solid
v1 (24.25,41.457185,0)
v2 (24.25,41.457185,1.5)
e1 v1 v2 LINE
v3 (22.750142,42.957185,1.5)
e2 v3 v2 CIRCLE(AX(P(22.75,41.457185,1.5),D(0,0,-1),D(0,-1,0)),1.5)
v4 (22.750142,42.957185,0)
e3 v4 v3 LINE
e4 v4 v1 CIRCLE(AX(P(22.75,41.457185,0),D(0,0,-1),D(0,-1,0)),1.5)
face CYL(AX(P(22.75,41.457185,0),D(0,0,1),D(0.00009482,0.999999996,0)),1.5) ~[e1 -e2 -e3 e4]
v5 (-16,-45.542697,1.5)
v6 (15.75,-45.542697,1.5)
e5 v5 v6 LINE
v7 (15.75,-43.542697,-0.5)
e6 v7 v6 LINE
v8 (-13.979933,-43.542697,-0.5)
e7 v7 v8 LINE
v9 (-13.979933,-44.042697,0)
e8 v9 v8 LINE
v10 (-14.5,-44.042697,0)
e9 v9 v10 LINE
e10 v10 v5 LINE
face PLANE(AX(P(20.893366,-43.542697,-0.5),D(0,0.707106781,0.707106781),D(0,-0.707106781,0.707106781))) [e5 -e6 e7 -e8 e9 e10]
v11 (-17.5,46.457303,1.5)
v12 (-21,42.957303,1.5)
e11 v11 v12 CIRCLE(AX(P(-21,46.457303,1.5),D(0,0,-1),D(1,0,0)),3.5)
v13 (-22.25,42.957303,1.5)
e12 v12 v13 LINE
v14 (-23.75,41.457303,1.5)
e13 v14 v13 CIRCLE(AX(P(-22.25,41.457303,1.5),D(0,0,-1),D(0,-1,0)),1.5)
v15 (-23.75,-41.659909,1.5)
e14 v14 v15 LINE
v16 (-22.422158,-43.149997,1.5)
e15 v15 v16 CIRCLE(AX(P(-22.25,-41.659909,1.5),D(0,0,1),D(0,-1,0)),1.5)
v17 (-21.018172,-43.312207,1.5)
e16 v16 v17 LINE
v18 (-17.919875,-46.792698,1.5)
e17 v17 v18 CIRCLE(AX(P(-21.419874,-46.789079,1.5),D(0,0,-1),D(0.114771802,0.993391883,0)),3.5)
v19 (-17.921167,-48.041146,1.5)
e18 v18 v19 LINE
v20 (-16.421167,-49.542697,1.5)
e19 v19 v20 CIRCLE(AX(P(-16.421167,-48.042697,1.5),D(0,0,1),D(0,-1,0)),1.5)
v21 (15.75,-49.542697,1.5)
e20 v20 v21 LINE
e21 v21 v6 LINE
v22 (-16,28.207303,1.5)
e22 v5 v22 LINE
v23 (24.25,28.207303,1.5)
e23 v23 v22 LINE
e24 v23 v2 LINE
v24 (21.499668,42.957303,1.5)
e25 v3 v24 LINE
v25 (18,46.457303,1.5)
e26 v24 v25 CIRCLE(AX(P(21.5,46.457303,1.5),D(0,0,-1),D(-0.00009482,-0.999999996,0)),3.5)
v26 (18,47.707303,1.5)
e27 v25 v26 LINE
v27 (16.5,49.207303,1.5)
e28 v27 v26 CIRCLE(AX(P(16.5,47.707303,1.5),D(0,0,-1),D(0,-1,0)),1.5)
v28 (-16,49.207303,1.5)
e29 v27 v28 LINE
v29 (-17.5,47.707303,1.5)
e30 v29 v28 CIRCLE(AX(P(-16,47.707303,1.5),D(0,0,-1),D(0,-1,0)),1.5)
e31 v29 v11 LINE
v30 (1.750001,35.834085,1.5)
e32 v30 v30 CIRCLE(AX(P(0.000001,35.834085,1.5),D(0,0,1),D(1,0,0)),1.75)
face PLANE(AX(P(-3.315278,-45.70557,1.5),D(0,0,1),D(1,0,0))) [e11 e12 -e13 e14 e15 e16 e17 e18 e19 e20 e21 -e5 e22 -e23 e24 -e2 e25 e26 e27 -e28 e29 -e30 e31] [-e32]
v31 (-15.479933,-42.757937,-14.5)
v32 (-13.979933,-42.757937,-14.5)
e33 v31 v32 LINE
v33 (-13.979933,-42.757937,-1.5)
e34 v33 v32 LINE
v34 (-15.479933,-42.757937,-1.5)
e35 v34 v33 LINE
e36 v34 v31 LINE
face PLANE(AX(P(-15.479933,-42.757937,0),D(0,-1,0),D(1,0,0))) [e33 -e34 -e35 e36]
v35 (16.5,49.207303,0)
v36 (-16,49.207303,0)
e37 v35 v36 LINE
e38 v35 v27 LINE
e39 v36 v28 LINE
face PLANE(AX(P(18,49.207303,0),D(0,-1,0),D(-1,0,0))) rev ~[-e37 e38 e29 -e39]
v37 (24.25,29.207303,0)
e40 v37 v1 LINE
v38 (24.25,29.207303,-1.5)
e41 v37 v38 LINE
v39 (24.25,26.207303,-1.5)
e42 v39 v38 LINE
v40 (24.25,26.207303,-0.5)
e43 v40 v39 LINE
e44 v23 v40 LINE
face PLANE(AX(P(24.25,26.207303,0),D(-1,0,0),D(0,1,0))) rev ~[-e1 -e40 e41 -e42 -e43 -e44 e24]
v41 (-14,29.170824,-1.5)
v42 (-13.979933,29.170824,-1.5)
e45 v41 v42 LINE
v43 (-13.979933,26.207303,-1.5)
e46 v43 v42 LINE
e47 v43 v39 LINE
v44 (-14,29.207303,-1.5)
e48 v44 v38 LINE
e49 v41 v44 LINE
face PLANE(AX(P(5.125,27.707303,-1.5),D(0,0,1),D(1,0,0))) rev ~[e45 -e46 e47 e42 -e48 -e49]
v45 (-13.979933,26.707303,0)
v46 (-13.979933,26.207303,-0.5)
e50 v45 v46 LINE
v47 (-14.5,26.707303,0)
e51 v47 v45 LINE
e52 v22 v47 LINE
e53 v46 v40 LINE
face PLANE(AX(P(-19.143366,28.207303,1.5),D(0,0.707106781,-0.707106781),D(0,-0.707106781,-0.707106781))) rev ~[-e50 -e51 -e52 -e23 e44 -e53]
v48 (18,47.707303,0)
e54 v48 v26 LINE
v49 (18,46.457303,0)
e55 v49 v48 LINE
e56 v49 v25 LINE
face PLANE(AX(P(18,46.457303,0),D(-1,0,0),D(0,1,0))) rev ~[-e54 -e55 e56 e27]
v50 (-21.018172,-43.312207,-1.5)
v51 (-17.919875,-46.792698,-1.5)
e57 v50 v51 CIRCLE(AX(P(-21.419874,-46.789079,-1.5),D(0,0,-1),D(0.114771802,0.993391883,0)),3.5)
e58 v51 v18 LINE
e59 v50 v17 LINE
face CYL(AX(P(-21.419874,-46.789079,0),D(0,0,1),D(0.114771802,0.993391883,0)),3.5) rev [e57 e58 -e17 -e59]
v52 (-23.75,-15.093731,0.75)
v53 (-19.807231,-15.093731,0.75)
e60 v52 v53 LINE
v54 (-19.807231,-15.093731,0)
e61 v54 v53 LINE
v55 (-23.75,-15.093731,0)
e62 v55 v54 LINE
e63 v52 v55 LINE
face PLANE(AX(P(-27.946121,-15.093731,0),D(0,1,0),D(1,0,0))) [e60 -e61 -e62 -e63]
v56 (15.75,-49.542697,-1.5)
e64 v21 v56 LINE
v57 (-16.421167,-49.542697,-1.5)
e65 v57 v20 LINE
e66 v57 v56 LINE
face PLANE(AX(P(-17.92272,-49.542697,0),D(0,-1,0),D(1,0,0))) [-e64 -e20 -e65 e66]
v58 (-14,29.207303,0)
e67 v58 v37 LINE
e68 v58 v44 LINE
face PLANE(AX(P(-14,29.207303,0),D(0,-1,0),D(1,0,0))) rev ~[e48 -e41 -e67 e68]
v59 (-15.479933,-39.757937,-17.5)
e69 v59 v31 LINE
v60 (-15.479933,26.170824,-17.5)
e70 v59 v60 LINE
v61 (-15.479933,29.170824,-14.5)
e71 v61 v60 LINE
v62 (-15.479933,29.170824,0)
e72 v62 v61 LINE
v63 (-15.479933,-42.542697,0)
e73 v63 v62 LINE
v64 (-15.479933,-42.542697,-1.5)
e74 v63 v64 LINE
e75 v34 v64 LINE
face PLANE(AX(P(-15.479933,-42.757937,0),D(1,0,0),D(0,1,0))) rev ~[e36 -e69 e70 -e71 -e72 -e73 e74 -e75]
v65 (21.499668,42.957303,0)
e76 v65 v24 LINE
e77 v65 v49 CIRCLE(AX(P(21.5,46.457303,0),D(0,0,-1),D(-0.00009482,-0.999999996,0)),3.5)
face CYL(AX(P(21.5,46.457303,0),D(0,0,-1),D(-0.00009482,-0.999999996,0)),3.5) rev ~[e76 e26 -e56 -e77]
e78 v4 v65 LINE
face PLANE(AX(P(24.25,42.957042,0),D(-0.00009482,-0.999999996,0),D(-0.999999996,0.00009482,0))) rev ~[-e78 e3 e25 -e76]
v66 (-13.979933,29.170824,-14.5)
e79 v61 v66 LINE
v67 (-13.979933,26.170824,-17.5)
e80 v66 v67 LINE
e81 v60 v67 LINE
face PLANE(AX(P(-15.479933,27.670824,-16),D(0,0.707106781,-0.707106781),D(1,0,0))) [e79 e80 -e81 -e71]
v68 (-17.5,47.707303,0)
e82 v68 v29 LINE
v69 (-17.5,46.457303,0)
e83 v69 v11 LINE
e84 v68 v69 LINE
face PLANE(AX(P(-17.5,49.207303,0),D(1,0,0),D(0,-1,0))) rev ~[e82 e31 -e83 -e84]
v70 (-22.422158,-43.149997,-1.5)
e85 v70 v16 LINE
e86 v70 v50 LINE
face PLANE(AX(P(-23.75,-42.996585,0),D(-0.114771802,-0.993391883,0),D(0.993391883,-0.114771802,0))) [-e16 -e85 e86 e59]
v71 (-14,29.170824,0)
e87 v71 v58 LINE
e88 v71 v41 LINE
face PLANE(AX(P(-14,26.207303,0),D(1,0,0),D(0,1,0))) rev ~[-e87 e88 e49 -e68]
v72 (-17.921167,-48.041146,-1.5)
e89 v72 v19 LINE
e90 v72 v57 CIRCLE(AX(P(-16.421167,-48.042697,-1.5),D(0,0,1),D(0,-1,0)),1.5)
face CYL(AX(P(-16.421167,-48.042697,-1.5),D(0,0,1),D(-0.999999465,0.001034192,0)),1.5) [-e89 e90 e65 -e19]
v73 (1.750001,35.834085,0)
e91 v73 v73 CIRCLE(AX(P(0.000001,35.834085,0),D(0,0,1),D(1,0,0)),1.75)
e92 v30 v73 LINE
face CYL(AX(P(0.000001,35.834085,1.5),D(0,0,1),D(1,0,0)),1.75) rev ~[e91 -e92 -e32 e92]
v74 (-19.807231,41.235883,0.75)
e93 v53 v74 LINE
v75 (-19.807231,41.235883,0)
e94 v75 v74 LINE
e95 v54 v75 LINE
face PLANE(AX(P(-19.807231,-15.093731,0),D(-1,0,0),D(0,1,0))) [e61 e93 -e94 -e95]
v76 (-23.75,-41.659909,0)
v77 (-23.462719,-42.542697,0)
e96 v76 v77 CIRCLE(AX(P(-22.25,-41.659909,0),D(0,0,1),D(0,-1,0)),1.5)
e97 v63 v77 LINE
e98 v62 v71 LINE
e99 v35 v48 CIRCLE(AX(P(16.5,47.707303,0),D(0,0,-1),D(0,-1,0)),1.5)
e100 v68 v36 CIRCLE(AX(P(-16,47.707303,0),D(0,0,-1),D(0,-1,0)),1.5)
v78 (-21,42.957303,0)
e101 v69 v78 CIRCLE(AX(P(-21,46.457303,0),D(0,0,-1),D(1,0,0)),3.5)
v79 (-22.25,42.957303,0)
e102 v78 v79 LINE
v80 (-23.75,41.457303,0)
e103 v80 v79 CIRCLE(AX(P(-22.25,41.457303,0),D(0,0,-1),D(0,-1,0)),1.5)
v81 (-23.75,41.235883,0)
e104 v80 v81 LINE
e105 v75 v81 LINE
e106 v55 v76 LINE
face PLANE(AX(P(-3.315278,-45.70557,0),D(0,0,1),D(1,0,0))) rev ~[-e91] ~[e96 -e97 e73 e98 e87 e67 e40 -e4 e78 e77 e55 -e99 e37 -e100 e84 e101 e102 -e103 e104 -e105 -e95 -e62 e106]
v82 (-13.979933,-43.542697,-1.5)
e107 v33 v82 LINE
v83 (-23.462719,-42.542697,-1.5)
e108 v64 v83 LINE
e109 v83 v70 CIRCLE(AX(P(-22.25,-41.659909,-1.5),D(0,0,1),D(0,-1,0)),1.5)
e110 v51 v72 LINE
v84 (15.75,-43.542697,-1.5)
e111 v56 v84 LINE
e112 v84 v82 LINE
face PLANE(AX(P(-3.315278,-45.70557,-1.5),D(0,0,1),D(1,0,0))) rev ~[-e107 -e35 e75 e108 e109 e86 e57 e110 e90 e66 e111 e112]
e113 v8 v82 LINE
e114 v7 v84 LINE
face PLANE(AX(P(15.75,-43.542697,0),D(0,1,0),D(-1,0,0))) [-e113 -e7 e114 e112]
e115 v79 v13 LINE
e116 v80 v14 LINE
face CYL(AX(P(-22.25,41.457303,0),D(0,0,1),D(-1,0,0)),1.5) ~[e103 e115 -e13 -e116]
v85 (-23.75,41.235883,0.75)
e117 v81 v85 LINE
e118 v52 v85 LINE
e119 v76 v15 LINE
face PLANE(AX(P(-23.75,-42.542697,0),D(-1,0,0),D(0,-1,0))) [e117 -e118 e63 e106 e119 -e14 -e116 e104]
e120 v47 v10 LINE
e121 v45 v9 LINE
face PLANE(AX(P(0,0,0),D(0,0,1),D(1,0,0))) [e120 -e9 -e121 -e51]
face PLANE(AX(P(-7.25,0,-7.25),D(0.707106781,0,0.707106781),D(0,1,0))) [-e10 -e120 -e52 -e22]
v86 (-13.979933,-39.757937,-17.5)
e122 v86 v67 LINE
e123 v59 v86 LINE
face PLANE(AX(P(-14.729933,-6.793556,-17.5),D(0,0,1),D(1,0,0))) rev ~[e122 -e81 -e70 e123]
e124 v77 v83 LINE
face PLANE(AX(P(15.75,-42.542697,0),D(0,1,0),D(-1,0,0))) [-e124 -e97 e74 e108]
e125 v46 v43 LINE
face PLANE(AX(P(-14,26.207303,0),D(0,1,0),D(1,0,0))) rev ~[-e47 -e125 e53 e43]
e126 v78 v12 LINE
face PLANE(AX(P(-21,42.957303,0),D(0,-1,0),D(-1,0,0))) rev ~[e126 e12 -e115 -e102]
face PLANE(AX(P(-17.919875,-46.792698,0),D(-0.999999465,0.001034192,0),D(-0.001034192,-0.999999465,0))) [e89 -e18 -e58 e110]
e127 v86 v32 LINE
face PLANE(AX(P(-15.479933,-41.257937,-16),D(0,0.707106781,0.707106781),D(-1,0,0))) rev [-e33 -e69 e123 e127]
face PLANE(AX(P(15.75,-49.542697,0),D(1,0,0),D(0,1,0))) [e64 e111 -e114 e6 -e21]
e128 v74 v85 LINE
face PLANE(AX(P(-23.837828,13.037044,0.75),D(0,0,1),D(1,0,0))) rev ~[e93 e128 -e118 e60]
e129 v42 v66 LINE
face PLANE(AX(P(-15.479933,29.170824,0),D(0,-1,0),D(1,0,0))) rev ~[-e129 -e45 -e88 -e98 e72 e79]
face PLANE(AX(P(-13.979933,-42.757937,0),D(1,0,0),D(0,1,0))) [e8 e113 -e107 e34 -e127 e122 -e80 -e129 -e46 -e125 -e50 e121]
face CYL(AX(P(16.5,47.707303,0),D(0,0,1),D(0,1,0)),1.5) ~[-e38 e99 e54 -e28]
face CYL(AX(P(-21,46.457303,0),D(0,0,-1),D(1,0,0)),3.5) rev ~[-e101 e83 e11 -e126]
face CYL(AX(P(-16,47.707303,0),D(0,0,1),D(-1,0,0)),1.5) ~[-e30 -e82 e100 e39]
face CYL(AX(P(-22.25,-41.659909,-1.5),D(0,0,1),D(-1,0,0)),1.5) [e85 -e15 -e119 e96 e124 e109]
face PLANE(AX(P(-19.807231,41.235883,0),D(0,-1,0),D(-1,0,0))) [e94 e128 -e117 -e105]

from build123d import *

# Parameters (mm, degrees)
F0_W          = 38.25
F0_H          = 3
F1_DEPTH      = 1.5
F2_DEPTH      = 1.5
F5_DEPTH      = 0.75
F6_R          = 1.5
F7_W          = 1.5
F7_H          = 71.928761142
F8_DEPTH      = 17.5
F10_SIZE      = 3
F13_R         = 1.75
F14_DEPTH     = 25
F15_DEPTH     = 1
F16_T4_DEPTH  = 48.5367319519
F16_T10_DEPTH = 48.5367319519
F16_T15_DEPTH = 80.0367319519
F16_T22_DEPTH = 40.0367319519
F16_T27_DEPTH = 40.0367319519


# Not quite as in the source:
# - a fillet or chamfer that OpenCascade refuses, or shapes differently, is made with other operations: its cross-section is extruded or revolved along the edge and cut away or added


with BuildPart() as f1:
    # F0 (on Top) → F1 (new body)
    with BuildSketch(Plane.XY):
        with BuildLine():
            Line((-14, -42.5426968038), (-23.75, -42.5426968038))
            Line((-23.75, -42.5426968038), (-23.75, -42.9965845553))
            Line((-23.75, -42.9965845553), (-21.0181723213, -43.3122070099))
            ThreePointArc((-21.0181723213, -43.3122070099), (-18.8056300503, -44.4619063855), (-17.919875499, -46.7926982744))
            Line((-17.919875499, -46.7926982744), (-17.9227195281, -49.5426968038))
            Line((-17.9227195281, -49.5426968038), (15.75, -49.5426968038))
            Line((15.75, -49.5426968038), (15.75, -42.5426968038))
            Line((15.75, -42.5426968038), (-14, -42.5426968038))
        make_face()
        with BuildLine():
            Line((18, 49.2073031962), (-17.5, 49.2073031962))
            Line((-17.5, 49.2073031962), (-17.5, 46.4573031962))
            ThreePointArc((-17.5, 46.4573031962), (-18.5251262658, 43.982429462), (-21, 42.9573031962))
            Line((-21, 42.9573031962), (-23.75, 42.9573031962))
            Line((-23.75, 42.9573031962), (-23.75, -42.5426968038))
            Line((-23.75, -42.5426968038), (-14, -42.5426968038))
            Line((-14, -42.5426968038), (-14, 26.2073031962))
            Line((-14, 26.2073031962), (-14, 29.2073031962))
            Line((-14, 29.2073031962), (24.25, 29.2073031962))
            Line((24.25, 29.2073031962), (24.25, 42.9570424259))
            Line((24.25, 42.9570424259), (21.4996681305, 42.9573032119))
            ThreePointArc((21.4996681305, 42.9573032119), (19.0250089351, 43.9825467984), (18, 46.4573031962))
            Line((18, 46.4573031962), (18, 49.2073031962))
        make_face()
        with Locations((5.125, 27.7073031962)):
            Rectangle(F0_W, F0_H)
    extrude(amount=F1_DEPTH)

    # F0 (on Top) → F2 (join)
    with BuildSketch(Plane.XY):
        with BuildLine():
            Line((-14, -42.5426968038), (-23.75, -42.5426968038))
            Line((-23.75, -42.5426968038), (-23.75, -42.9965845553))
            Line((-23.75, -42.9965845553), (-21.0181723213, -43.3122070099))
            ThreePointArc((-21.0181723213, -43.3122070099), (-18.8056300503, -44.4619063855), (-17.919875499, -46.7926982744))
            Line((-17.919875499, -46.7926982744), (-17.9227195281, -49.5426968038))
            Line((-17.9227195281, -49.5426968038), (15.75, -49.5426968038))
            Line((15.75, -49.5426968038), (15.75, -42.5426968038))
            Line((15.75, -42.5426968038), (-14, -42.5426968038))
        make_face()
        with Locations((5.125, 27.7073031962)):
            Rectangle(F0_W, F0_H)
    extrude(amount=-F2_DEPTH)

    # F3: union 

    # F4 (on face) → F5 (cut)
    with BuildSketch(Plane.XY):
        Polygon((-19.8072306812, 41.2358827889), (-27.7905139636, 41.2358827889), (-27.9461211857, -15.0937307626), (-19.8072306812, -15.0937307626), align=None)
    extrude(amount=F5_DEPTH, mode=Mode.SUBTRACT)

    # F6
    f6_edges = [f1.edges().sort_by_distance(p)[0] for p in [
        (-17.5, 49.207303, 0.75),
        (-23.75, 42.957303, 0.75),
        (18, 49.207303, 0.75),
        (24.25, 42.957042, 0.75),
        (-23.75, -42.996585, 0),
        (-17.92272, -49.542697, 0),
    ]]
    fillet(f6_edges, radius=F6_R)

    # F7 (on Top) → F8 (join)
    with BuildSketch(Plane.XY):
        with Locations((-14.7299332246, -6.7935563562)):
            Rectangle(F7_W, F7_H)
    extrude(amount=-F8_DEPTH)

    # F9: union 

    # F10
    f10_edges = [f1.edges().sort_by_distance(p)[0] for p in [
        (-14.729933, -42.757937, -17.5),
        (-14.729933, 29.170824, -17.5),
    ]]
    chamfer(f10_edges, length=F10_SIZE)


with BuildPart() as f11_1:
    # F11: copy of F1
    add(f1.part)


with BuildPart() as f1_1:
    add(f1.part)

    # F13 (on face) → F14 (cut)
    with BuildSketch(Plane.XY.offset(1.5)):
        with Locations((5.438e-07, 35.8340851963)):
            Circle(F13_R)
    extrude(amount=-F14_DEPTH, mode=Mode.SUBTRACT)

    # F15 (cut): a face of the model
    f15_faces = [f1_1.faces().sort_by_distance(p)[0] for p in [
        (0.8800150014, -42.5426968038, 0.0002530279),
    ]]
    extrude(f15_faces, amount=-F15_DEPTH, mode=Mode.SUBTRACT)

    # F16: chamfer of 2 on 3 edges, made by hand


with BuildPart() as f16_tool2:
    # F16_s3 → F16_t4 (new body)
    with BuildSketch(Plane.YZ.offset(-19.1433659759)):
        Polygon((28.2073031962, 1.5), (26.2073031962, -0.5), (26.2073031962, 1.5), align=None)
    extrude(amount=F16_T4_DEPTH)

    split(bisect_by=Plane.XY, keep=Keep.TOP)

    split(bisect_by=Plane(origin=(-7.25, 0, -7.25), x_dir=(0, 1, 0), z_dir=(0.7071067812, 0, 0.7071067812)), keep=Keep.TOP)


with BuildPart() as f1_2:
    add(f1_1.part)

    # F16_t1: cut F16_tool2
    add(f16_tool2.part, mode=Mode.SUBTRACT)


with BuildPart() as f16_tool8:
    # F16_s9 → F16_t10 (new body)
    with BuildSketch(Plane.YZ.offset(-19.1433659759)):
        Polygon((28.2073031962, 1.5), (26.2073031962, -0.5), (26.2073031962, 1.5), align=None)
    extrude(amount=F16_T10_DEPTH)

    split(bisect_by=Plane.YZ.offset(-13.9799332246), keep=Keep.TOP)


with BuildPart() as f1_3:
    add(f1_2.part)

    # F16_t7: cut F16_tool8
    add(f16_tool8.part, mode=Mode.SUBTRACT)


with BuildPart() as f16_tool13:
    # F16_s14 → F16_t15 (new body)
    with BuildSketch(Plane.XZ.offset(48.6860627797)):
        Polygon((-14, -0.5), (-16, 1.5), (-14, 1.5), align=None)
    extrude(amount=-F16_T15_DEPTH)

    split(bisect_by=Plane.XY, keep=Keep.TOP)

    split(bisect_by=Plane(origin=(0, 13.3536515981, -13.3536515981), x_dir=(1, 0, 0), z_dir=(0, -0.7071067812, 0.7071067812)), keep=Keep.TOP)

    split(bisect_by=Plane(origin=(0, -22.0213484019, -22.0213484019), x_dir=(1, 0, 0), z_dir=(0, 0.7071067812, 0.7071067812)), keep=Keep.TOP)


with BuildPart() as f1_4:
    add(f1_3.part)

    # F16_t12: cut F16_tool13
    add(f16_tool13.part, mode=Mode.SUBTRACT)


with BuildPart() as f16_tool20:
    # F16_s21 → F16_t22 (new body)
    with BuildSketch(Plane.YZ.offset(20.8933659759)):
        Polygon((-43.5426968038, -0.5), (-45.5426968038, 1.5), (-43.5426968038, 1.5), align=None)
    extrude(amount=-F16_T22_DEPTH)

    split(bisect_by=Plane.YZ.offset(-13.9799332246), keep=Keep.TOP)


with BuildPart() as f1_5:
    add(f1_4.part)

    # F16_t19: cut F16_tool20
    add(f16_tool20.part, mode=Mode.SUBTRACT)


with BuildPart() as f16_tool25:
    # F16_s26 → F16_t27 (new body)
    with BuildSketch(Plane.YZ.offset(20.8933659759)):
        Polygon((-43.5426968038, -0.5), (-45.5426968038, 1.5), (-43.5426968038, 1.5), align=None)
    extrude(amount=-F16_T27_DEPTH)

    split(bisect_by=Plane.XY, keep=Keep.TOP)

    split(bisect_by=Plane(origin=(-7.25, 0, -7.25), x_dir=(0, 1, 0), z_dir=(0.7071067812, 0, 0.7071067812)), keep=Keep.TOP)


with BuildPart() as f1_6:
    add(f1_5.part)

    # F16_t24: cut F16_tool25
    add(f16_tool25.part, mode=Mode.SUBTRACT)


solid = f1_6.part
